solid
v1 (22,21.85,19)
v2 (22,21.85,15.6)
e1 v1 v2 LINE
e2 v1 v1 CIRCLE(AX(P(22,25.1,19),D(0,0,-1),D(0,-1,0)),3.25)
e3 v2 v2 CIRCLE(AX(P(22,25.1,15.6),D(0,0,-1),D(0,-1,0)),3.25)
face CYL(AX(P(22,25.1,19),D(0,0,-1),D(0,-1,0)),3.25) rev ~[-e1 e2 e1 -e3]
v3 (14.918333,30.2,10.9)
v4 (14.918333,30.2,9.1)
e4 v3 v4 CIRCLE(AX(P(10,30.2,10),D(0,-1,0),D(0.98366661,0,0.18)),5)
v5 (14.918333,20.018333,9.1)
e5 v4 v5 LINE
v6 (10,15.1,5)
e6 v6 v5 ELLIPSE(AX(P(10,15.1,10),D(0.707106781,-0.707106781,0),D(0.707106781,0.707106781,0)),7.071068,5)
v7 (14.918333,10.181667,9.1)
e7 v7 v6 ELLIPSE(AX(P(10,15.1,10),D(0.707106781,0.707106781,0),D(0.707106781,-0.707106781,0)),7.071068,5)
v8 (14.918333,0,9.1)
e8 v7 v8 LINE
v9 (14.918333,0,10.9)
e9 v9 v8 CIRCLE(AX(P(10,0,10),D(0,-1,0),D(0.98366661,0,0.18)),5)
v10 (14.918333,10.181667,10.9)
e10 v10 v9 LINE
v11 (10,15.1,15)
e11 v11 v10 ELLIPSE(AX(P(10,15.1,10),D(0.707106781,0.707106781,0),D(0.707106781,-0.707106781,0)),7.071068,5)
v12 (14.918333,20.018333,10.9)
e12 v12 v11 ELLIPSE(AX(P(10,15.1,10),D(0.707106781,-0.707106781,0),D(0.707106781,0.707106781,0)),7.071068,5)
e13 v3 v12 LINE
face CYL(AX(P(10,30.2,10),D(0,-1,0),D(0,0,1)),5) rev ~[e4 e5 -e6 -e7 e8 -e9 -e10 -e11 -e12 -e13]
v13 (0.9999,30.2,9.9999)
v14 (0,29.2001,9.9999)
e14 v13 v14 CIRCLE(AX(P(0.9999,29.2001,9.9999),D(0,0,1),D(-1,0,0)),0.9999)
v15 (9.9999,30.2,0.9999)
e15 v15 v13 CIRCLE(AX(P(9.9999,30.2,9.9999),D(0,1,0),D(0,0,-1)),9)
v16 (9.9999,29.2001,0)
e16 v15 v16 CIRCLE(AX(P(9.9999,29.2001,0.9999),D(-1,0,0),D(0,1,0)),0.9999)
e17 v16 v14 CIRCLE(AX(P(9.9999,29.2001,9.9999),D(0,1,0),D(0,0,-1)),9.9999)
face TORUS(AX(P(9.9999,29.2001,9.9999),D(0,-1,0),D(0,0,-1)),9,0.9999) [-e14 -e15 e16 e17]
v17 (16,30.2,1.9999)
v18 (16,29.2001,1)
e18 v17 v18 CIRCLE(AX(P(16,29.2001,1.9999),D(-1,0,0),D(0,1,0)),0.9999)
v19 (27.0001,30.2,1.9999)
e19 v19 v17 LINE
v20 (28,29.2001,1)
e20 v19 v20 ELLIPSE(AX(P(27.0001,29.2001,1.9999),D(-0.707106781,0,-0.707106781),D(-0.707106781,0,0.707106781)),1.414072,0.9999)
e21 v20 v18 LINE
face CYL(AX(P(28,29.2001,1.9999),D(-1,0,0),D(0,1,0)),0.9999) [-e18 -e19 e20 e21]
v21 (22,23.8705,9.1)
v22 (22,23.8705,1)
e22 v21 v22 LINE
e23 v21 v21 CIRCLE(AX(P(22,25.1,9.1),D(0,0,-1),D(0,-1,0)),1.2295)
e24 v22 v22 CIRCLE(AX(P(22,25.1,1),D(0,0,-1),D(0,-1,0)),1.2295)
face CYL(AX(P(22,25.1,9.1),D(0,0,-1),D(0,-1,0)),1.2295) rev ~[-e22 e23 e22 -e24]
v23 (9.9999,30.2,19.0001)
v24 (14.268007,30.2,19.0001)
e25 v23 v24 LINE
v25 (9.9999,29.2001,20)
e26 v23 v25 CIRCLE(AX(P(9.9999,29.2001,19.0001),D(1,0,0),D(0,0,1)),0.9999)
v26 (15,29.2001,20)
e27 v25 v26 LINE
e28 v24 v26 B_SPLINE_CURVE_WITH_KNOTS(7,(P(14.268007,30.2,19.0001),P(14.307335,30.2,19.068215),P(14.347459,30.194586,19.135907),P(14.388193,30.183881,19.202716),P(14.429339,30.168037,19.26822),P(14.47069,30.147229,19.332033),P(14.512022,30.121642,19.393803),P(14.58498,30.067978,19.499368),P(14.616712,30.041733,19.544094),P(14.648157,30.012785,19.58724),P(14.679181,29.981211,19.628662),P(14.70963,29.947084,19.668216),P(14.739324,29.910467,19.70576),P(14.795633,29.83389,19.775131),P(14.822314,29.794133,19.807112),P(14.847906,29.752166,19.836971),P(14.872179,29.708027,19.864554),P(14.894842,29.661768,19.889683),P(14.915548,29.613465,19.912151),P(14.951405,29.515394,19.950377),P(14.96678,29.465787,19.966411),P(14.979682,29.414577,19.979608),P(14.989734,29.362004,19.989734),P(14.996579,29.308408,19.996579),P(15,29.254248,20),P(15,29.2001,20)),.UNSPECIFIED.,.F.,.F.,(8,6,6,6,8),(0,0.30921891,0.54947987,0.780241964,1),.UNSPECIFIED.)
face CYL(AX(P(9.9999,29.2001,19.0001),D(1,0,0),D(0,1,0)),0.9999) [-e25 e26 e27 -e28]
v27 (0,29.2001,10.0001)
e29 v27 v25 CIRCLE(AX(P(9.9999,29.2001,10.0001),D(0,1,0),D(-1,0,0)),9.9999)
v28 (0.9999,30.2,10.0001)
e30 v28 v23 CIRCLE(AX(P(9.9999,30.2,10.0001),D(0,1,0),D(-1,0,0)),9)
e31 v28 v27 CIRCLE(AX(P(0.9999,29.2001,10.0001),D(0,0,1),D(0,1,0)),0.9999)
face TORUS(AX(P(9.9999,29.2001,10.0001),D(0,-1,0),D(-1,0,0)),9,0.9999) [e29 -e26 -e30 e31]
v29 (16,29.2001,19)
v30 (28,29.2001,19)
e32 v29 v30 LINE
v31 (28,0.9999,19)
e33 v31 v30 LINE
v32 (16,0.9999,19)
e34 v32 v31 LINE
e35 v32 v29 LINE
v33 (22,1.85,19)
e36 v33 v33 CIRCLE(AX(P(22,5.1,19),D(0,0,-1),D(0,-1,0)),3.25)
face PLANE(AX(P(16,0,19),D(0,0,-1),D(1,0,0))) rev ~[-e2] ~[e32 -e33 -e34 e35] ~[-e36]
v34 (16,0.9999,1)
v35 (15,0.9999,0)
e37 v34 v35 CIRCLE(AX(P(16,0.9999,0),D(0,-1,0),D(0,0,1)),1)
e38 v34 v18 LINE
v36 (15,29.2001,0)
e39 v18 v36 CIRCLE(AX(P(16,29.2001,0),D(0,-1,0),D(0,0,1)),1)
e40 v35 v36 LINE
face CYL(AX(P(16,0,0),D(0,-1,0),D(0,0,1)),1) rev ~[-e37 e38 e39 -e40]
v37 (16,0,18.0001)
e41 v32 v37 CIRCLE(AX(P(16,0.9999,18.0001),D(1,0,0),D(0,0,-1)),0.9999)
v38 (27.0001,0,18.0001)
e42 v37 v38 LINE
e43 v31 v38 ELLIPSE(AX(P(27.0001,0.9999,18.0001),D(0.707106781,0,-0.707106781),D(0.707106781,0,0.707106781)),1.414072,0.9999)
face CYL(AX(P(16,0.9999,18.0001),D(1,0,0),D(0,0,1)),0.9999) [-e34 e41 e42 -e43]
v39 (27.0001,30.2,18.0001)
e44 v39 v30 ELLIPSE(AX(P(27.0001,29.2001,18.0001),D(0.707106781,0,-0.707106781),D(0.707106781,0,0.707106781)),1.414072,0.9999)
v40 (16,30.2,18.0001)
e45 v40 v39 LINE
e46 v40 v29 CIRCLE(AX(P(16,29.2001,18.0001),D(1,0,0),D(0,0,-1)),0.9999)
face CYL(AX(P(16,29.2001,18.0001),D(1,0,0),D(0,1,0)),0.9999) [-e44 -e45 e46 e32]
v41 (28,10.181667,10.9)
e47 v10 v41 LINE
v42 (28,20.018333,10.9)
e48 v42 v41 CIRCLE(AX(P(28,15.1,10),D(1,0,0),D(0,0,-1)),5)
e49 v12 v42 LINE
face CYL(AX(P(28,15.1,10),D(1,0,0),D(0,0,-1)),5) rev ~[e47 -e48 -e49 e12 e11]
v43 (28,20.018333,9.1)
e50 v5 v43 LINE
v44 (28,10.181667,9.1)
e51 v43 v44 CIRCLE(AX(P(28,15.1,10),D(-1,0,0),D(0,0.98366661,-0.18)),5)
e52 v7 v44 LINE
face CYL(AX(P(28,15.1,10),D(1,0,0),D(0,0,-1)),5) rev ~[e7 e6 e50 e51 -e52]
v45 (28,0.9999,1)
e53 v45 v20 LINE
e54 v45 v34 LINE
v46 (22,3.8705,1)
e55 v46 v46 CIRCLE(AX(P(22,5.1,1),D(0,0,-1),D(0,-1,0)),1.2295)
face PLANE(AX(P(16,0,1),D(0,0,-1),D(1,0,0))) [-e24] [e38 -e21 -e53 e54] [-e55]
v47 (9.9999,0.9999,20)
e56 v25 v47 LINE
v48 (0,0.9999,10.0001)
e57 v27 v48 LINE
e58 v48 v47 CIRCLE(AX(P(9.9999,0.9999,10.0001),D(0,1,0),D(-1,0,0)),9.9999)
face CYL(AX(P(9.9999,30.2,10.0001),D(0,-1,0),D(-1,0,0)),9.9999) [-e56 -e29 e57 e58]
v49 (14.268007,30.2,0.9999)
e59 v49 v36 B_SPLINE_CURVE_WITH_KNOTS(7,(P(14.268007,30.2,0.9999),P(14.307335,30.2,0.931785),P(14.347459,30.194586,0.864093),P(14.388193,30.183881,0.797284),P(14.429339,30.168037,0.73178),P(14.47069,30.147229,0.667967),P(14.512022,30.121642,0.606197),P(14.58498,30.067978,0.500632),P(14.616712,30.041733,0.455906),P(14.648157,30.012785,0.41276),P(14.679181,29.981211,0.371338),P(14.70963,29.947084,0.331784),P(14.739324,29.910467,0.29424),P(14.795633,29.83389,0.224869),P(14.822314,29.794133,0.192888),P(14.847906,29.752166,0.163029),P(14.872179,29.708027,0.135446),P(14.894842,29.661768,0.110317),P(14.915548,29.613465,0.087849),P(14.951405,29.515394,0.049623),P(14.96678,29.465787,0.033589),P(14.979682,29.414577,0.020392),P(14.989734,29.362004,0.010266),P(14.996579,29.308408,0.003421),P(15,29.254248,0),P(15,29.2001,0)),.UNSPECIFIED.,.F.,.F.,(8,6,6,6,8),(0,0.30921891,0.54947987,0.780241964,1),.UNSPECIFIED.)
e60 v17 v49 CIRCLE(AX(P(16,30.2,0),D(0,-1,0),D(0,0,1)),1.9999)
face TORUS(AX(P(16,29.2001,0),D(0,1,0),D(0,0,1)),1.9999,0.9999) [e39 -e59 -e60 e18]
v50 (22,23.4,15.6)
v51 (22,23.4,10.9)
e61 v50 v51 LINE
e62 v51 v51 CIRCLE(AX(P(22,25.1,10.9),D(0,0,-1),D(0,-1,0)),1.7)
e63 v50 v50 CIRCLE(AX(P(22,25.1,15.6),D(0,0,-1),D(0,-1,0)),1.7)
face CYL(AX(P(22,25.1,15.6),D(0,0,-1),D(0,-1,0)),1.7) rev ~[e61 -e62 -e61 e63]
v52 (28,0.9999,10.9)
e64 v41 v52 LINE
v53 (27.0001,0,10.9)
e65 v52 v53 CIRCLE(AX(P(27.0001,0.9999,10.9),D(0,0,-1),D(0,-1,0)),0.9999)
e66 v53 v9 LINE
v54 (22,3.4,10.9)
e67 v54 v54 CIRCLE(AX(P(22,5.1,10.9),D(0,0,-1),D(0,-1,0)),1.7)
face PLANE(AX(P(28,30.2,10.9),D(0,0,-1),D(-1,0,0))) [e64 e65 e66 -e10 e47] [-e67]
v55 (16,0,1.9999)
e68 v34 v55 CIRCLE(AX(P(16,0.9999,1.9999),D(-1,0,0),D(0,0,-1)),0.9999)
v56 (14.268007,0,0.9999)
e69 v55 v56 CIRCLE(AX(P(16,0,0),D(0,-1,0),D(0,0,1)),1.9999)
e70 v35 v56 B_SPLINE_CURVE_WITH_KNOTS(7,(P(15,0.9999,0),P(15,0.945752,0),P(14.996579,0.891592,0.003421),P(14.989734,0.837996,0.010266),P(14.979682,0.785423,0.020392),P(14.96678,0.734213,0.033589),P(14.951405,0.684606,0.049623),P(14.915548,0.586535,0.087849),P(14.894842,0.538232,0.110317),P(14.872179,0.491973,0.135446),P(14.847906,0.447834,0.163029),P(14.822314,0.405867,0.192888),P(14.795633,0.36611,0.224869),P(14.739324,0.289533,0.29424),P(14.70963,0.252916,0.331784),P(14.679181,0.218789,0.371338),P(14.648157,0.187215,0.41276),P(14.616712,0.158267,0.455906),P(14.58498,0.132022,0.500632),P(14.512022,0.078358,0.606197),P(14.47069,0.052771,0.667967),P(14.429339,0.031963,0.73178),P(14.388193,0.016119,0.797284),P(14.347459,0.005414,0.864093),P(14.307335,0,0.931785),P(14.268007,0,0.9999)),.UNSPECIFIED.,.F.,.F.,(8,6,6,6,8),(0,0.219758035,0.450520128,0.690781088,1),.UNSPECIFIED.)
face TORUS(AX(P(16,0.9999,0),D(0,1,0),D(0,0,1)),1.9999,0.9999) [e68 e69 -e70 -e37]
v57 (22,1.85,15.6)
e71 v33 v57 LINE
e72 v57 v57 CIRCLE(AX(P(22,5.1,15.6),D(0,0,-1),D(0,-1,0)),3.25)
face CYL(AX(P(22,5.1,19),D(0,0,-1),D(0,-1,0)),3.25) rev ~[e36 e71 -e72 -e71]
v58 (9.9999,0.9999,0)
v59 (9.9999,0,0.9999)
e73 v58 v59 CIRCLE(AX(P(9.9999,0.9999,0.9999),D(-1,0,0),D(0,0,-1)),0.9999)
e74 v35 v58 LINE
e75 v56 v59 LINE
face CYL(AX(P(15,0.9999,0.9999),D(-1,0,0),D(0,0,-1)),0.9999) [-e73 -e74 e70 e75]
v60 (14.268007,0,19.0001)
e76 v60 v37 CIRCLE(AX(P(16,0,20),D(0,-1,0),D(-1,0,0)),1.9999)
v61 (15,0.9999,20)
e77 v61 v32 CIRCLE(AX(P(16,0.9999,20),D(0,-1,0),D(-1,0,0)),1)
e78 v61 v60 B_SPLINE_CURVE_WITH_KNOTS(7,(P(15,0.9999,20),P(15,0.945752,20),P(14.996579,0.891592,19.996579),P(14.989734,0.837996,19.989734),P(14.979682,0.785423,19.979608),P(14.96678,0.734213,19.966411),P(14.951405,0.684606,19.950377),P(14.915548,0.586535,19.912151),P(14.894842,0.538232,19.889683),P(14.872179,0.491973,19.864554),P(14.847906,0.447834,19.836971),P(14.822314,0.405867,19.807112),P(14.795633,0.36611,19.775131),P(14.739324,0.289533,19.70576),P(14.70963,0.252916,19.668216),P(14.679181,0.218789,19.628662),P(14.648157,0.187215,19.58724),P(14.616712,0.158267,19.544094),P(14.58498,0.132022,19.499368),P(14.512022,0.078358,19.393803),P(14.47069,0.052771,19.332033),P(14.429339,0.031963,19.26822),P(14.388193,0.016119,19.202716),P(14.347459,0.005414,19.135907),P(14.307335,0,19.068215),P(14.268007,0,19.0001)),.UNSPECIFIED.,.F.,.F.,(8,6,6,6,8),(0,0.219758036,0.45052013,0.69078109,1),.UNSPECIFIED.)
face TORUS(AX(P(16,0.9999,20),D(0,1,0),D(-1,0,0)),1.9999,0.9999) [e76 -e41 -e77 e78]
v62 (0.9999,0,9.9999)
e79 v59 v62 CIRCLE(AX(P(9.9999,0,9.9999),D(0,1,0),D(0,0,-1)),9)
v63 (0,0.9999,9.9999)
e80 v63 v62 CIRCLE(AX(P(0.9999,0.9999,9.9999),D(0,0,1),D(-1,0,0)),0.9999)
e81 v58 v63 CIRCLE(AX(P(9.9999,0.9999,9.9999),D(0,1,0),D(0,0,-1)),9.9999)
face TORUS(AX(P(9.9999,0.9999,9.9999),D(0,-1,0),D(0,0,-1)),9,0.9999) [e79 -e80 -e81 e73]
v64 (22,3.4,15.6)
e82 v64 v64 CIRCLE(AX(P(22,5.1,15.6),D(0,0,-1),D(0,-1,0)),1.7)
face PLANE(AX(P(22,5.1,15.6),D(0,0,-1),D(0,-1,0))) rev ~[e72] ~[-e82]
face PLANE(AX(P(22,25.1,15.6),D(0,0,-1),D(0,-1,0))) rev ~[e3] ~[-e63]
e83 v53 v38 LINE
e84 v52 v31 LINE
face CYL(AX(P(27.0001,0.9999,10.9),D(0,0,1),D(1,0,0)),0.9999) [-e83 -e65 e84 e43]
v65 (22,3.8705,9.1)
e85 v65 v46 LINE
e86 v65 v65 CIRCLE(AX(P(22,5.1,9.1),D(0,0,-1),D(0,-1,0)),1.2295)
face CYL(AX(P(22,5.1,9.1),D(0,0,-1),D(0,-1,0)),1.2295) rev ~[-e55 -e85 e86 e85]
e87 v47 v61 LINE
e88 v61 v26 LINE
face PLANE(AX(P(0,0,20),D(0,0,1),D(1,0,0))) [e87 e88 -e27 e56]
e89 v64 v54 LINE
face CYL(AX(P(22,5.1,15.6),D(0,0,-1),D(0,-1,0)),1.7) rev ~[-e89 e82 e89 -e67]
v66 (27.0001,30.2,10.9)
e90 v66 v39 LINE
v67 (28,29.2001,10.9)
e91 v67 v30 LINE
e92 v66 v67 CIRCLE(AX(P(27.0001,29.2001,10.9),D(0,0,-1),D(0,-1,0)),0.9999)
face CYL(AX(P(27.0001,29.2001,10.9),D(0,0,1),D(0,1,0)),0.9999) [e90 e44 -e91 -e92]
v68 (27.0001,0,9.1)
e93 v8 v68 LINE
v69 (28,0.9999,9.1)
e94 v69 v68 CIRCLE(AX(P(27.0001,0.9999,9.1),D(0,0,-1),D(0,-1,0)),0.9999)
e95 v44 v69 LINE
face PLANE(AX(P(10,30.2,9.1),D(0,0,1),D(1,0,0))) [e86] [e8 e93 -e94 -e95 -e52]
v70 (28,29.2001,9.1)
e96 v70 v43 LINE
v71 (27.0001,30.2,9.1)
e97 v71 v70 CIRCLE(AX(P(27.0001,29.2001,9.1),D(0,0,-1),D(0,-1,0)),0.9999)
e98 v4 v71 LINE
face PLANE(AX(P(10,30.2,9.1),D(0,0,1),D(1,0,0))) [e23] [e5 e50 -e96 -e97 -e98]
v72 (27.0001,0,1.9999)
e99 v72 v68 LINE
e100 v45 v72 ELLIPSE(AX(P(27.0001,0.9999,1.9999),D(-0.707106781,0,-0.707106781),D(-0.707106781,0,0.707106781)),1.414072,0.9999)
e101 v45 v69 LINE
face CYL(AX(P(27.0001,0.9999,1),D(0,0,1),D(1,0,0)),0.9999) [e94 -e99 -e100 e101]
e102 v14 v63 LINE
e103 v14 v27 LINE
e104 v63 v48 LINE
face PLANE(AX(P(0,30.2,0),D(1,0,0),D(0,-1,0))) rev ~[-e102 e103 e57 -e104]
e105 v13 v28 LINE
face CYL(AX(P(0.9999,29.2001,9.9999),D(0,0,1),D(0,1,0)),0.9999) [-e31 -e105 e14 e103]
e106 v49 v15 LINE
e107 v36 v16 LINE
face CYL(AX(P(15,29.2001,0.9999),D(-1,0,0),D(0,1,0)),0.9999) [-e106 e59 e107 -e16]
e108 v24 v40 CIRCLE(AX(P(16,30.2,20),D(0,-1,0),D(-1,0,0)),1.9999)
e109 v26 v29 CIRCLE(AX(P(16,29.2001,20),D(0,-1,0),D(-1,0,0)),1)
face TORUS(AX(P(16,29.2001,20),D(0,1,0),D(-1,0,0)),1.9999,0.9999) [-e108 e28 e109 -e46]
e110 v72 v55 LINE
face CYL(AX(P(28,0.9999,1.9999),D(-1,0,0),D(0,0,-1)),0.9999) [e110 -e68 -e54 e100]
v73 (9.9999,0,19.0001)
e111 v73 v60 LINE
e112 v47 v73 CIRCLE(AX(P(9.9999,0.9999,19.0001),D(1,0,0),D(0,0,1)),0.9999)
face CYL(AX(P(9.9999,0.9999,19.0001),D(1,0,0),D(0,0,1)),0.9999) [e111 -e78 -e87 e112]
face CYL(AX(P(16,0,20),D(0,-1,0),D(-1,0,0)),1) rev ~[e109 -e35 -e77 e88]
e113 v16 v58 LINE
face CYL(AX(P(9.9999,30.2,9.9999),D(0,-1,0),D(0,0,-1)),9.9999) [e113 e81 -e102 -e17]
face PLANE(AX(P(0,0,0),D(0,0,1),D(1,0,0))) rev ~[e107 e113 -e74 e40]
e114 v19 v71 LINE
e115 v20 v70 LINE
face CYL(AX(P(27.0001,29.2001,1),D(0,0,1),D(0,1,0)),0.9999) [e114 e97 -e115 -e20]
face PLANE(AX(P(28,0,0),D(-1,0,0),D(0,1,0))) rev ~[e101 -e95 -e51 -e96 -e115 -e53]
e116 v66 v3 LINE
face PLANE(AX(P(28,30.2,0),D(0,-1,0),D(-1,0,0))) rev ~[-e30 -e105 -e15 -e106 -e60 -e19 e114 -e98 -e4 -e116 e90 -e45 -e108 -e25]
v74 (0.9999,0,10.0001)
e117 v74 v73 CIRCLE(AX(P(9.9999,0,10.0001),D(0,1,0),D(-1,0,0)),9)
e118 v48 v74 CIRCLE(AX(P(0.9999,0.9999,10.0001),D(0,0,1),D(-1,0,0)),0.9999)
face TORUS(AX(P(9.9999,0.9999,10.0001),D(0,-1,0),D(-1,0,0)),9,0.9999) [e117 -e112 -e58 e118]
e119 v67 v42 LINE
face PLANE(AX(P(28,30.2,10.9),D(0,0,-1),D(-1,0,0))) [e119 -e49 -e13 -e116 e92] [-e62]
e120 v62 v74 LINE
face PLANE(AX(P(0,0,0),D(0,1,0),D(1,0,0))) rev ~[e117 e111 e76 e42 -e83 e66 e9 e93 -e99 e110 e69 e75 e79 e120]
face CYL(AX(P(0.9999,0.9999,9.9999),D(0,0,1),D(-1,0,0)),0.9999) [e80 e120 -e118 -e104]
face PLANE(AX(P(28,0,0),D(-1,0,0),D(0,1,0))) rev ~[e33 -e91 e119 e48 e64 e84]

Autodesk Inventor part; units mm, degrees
ref_plane "YZ Plane" through (0, 0, 0) normal (1, 0, 0) x (0, 1, 0)
ref_plane "XZ Plane" through (0, 0, 0) normal (0, 1, 0) x (-1, 0, 0)
ref_plane "XY Plane" through (0, 0, 0) normal (0, 0, 1) x (1, 0, 0)
sketch "Sketch1" plane through (0, 0, 0) normal (0, 0, 1) x (1, 0, 0)
  line L0 (28, 30.2) -> (0, 30.2)
  line L1 (0, 30.2) -> (0, 0)
  line L2 (0, 15.1) -> (28, 15.1) construction
  line L3 (28, 0) -> (28, 30.2)
  line L4 (0, 0) -> (28, 0)
  line L5 (20, 15.1) -> (20, 30.2) construction
  dimension "d0" = 30.2
  dimension "d3" = 28
  dimension "d26" = 20
  dimension "d27" = 8
extrude "Extrusion1" add sketch "Sketch1" along normal blind 20
sketch "Sketch2" plane through (0, 30.2, 0) normal (0, 1, 0) x (1, 0, 0)
  line L0 (0, 0) -> (0, -20) construction
  line L1 (0, 0) -> (28, 0) construction
  line L2 (10, -10) -> (0, -10) construction
  line L3 (0, 0) -> (0, -20) construction
  dimension "d48" = 10
hole "Hole1" at (10, 30.2, 10) direction (0, -1, 0) diameter 10 end through all
sketch "Sketch3" plane through (0, 0, 0) normal (0, -1, 0) x (1, 0, 0)
  line L0 (28, 20) -> (15, 20)
  line L1 (16, 19) -> (28, 19)
  line L2 (28, 19) -> (28, 20)
  circle A0 centre (16, 20) radius 1 construction
  arc A1 (15, 20) -> (16, 19) centre (16, 20) ccw
  circle A2 centre (10, 10) radius 5 construction
  line L3 (15, 10) -> (15, 20) construction
  line L4 (0, 20) -> (28, 20) construction
  line L5 (28, 0) -> (28, 20) construction
  line L6 (10, 10) -> (15, 10) construction
  line L7 (28, 0) -> (15, 0)
  line L8 (16, 1) -> (28, 1)
  line L9 (28, 1) -> (28, 0)
  arc A3 (16, 1) -> (15, 0) centre (16, 0) ccw
  point P0 (0, 0)
  dimension "d15" = 2
  dimension "d46" = 18
extrude "Extrusion2" cut sketch "Sketch3" against normal through all
fillet "Fillet1" radius 10 2 edges at (0, 15.1, 0) (0, 15.1, 20)
sketch "Sketch4" plane through (15, 30.2, 20) normal (0, 1, 0) x (1, 0, 0)
  circle A0 centre (-5, 10) radius 5 construction
  line L0 (-5, 10) -> (13, 10) construction
  line L1 (-5, 10.9) -> (13, 10.9)
  line L2 (13, 10.9) -> (13, 9.1)
  line L3 (13, 9.1) -> (-5, 9.1)
  line L4 (-5, 9.1) -> (-5, 10.9)
  line L5 (-5, 10.9) -> (13, 9.1) construction
  line L6 (13, 10.9) -> (-5, 9.1) construction
  line L7 (13, 19) -> (13, 1) construction
  point P0 (4, 10)
  point P1 (12, 15)
  point P2 (13, 1)
  point P3 (12, 18)
  dimension "d19" = 1.8
extrude "Extrusion3" cut sketch "Sketch4" against normal through all
sketch "Sketch5" plane through (28, 0, 19) normal (1, 0, 0) x (0, 0, -1)
  circle A0 centre (9, 15.1) radius 5
  line L0 (0, 0) -> (0, 30.2) construction
  line L1 (0, 0) -> (18, 30.2) construction
  line L2 (18, 0) -> (0, 30.2) construction
  line L3 (18, 0) -> (18, 30.2) construction
  dimension "d22" = 10
extrude "Extrusion4" cut sketch "Sketch5" against normal up to surface
sketch "Sketch6" plane through (16, 0, 19) normal (0, 0, 1) x (1, 0, 0)
  line L0 (0, 30.2) -> (12, 30.2) construction
  line L1 (0, 0) -> (0, 30.2) construction
  line L2 (12, 0) -> (0, 0) construction
  line L3 (12, 30.2) -> (12, 0) construction
  line L4 (6, 0) -> (6, 30.2) construction
  line L5 (6, 15.1) -> (0, 15.1) construction
  point P0 (-16, 0)
  point P1 (6, 5.1)
  point P2 (6, 25.1)
  dimension "d28" = 10
hole "Hole2" at (22, 5.1, 19) at (22, 25.1, 19) direction (0, 0, -1) diameter 3.4 depth 8.1 counterbore diameter 6.5 counterbore depth 3.4 clearance for "Socket Head Cap Screw ISO 4762" size "M3" standard "ISO"
sketch "Sketch7" plane through (14.9183, 30.2, 9.1) normal (0, 0, 1) x (1, 0, 0)
  point P0 (-14.9183, -30.2)
  point P1 (7.0817, -5.1)
  point P2 (7.0817, -25.1)
hole "Hole3" at (22, 25.1, 9.1) at (22, 5.1, 9.1) direction (0, 0, -1) diameter 2.459 depth 8.8 tip angle 118 thread size "M3x0.5" class "6H" standard "ISO Metric profile"
ref_plane "Work Plane1" through (16, 15.1, 19) normal (0, -1, 0) x (1, 0, 0)
fillet "Fillet2" radius 1 18 edges at (15.2929, 30.2, 19.2929) (22, 30.2, 19) (2.9289, 30.2, 2.9289) (12.4999, 30.2, 0) (12.4999, 30.2, 20) (15.2929, 30.2, 0.7071) (22, 30.2, 1) (15.2929, 0, 19.2929) (22, 0, 19) (12.4999, 0, 20) (12.4999, 0, 0) (2.9289, 0, 2.9289) (15.2929, 0, 0.7071) (22, 0, 1) (28, 0, 5.05) (28, 0, 14.95) (28, 30.2, 14.95) (28, 30.2, 5.05)
equation "\"d0\" = YawnFixation_Width"
equation "\"d26\" = YawnShaft_Diameter + Aufmass_ShaftFixationSide"
equation "\"d4\" = YawnShaft_Diameter + Aufmass_ShaftFixationSide"
equation "\"d48\" = 0.5 * d4"
equation "\"d7\" = YawnShaft_Diameter"
equation "\"d18\" = 0.5 * d4"
equation "\"d22\" = Shaft_DiaOut"
equation "\"Aufmass_ShaftFixationSide\" = 10"
equation "\"YawnFixation_Width\" = 30.2"
equation "\"YawnShaft_Diameter\" = 10"
equation "\"Shaft_DiaOut\" = 10"
properties part number "UpperArm_Yawn_Fixture" material "PBT Plastic"
